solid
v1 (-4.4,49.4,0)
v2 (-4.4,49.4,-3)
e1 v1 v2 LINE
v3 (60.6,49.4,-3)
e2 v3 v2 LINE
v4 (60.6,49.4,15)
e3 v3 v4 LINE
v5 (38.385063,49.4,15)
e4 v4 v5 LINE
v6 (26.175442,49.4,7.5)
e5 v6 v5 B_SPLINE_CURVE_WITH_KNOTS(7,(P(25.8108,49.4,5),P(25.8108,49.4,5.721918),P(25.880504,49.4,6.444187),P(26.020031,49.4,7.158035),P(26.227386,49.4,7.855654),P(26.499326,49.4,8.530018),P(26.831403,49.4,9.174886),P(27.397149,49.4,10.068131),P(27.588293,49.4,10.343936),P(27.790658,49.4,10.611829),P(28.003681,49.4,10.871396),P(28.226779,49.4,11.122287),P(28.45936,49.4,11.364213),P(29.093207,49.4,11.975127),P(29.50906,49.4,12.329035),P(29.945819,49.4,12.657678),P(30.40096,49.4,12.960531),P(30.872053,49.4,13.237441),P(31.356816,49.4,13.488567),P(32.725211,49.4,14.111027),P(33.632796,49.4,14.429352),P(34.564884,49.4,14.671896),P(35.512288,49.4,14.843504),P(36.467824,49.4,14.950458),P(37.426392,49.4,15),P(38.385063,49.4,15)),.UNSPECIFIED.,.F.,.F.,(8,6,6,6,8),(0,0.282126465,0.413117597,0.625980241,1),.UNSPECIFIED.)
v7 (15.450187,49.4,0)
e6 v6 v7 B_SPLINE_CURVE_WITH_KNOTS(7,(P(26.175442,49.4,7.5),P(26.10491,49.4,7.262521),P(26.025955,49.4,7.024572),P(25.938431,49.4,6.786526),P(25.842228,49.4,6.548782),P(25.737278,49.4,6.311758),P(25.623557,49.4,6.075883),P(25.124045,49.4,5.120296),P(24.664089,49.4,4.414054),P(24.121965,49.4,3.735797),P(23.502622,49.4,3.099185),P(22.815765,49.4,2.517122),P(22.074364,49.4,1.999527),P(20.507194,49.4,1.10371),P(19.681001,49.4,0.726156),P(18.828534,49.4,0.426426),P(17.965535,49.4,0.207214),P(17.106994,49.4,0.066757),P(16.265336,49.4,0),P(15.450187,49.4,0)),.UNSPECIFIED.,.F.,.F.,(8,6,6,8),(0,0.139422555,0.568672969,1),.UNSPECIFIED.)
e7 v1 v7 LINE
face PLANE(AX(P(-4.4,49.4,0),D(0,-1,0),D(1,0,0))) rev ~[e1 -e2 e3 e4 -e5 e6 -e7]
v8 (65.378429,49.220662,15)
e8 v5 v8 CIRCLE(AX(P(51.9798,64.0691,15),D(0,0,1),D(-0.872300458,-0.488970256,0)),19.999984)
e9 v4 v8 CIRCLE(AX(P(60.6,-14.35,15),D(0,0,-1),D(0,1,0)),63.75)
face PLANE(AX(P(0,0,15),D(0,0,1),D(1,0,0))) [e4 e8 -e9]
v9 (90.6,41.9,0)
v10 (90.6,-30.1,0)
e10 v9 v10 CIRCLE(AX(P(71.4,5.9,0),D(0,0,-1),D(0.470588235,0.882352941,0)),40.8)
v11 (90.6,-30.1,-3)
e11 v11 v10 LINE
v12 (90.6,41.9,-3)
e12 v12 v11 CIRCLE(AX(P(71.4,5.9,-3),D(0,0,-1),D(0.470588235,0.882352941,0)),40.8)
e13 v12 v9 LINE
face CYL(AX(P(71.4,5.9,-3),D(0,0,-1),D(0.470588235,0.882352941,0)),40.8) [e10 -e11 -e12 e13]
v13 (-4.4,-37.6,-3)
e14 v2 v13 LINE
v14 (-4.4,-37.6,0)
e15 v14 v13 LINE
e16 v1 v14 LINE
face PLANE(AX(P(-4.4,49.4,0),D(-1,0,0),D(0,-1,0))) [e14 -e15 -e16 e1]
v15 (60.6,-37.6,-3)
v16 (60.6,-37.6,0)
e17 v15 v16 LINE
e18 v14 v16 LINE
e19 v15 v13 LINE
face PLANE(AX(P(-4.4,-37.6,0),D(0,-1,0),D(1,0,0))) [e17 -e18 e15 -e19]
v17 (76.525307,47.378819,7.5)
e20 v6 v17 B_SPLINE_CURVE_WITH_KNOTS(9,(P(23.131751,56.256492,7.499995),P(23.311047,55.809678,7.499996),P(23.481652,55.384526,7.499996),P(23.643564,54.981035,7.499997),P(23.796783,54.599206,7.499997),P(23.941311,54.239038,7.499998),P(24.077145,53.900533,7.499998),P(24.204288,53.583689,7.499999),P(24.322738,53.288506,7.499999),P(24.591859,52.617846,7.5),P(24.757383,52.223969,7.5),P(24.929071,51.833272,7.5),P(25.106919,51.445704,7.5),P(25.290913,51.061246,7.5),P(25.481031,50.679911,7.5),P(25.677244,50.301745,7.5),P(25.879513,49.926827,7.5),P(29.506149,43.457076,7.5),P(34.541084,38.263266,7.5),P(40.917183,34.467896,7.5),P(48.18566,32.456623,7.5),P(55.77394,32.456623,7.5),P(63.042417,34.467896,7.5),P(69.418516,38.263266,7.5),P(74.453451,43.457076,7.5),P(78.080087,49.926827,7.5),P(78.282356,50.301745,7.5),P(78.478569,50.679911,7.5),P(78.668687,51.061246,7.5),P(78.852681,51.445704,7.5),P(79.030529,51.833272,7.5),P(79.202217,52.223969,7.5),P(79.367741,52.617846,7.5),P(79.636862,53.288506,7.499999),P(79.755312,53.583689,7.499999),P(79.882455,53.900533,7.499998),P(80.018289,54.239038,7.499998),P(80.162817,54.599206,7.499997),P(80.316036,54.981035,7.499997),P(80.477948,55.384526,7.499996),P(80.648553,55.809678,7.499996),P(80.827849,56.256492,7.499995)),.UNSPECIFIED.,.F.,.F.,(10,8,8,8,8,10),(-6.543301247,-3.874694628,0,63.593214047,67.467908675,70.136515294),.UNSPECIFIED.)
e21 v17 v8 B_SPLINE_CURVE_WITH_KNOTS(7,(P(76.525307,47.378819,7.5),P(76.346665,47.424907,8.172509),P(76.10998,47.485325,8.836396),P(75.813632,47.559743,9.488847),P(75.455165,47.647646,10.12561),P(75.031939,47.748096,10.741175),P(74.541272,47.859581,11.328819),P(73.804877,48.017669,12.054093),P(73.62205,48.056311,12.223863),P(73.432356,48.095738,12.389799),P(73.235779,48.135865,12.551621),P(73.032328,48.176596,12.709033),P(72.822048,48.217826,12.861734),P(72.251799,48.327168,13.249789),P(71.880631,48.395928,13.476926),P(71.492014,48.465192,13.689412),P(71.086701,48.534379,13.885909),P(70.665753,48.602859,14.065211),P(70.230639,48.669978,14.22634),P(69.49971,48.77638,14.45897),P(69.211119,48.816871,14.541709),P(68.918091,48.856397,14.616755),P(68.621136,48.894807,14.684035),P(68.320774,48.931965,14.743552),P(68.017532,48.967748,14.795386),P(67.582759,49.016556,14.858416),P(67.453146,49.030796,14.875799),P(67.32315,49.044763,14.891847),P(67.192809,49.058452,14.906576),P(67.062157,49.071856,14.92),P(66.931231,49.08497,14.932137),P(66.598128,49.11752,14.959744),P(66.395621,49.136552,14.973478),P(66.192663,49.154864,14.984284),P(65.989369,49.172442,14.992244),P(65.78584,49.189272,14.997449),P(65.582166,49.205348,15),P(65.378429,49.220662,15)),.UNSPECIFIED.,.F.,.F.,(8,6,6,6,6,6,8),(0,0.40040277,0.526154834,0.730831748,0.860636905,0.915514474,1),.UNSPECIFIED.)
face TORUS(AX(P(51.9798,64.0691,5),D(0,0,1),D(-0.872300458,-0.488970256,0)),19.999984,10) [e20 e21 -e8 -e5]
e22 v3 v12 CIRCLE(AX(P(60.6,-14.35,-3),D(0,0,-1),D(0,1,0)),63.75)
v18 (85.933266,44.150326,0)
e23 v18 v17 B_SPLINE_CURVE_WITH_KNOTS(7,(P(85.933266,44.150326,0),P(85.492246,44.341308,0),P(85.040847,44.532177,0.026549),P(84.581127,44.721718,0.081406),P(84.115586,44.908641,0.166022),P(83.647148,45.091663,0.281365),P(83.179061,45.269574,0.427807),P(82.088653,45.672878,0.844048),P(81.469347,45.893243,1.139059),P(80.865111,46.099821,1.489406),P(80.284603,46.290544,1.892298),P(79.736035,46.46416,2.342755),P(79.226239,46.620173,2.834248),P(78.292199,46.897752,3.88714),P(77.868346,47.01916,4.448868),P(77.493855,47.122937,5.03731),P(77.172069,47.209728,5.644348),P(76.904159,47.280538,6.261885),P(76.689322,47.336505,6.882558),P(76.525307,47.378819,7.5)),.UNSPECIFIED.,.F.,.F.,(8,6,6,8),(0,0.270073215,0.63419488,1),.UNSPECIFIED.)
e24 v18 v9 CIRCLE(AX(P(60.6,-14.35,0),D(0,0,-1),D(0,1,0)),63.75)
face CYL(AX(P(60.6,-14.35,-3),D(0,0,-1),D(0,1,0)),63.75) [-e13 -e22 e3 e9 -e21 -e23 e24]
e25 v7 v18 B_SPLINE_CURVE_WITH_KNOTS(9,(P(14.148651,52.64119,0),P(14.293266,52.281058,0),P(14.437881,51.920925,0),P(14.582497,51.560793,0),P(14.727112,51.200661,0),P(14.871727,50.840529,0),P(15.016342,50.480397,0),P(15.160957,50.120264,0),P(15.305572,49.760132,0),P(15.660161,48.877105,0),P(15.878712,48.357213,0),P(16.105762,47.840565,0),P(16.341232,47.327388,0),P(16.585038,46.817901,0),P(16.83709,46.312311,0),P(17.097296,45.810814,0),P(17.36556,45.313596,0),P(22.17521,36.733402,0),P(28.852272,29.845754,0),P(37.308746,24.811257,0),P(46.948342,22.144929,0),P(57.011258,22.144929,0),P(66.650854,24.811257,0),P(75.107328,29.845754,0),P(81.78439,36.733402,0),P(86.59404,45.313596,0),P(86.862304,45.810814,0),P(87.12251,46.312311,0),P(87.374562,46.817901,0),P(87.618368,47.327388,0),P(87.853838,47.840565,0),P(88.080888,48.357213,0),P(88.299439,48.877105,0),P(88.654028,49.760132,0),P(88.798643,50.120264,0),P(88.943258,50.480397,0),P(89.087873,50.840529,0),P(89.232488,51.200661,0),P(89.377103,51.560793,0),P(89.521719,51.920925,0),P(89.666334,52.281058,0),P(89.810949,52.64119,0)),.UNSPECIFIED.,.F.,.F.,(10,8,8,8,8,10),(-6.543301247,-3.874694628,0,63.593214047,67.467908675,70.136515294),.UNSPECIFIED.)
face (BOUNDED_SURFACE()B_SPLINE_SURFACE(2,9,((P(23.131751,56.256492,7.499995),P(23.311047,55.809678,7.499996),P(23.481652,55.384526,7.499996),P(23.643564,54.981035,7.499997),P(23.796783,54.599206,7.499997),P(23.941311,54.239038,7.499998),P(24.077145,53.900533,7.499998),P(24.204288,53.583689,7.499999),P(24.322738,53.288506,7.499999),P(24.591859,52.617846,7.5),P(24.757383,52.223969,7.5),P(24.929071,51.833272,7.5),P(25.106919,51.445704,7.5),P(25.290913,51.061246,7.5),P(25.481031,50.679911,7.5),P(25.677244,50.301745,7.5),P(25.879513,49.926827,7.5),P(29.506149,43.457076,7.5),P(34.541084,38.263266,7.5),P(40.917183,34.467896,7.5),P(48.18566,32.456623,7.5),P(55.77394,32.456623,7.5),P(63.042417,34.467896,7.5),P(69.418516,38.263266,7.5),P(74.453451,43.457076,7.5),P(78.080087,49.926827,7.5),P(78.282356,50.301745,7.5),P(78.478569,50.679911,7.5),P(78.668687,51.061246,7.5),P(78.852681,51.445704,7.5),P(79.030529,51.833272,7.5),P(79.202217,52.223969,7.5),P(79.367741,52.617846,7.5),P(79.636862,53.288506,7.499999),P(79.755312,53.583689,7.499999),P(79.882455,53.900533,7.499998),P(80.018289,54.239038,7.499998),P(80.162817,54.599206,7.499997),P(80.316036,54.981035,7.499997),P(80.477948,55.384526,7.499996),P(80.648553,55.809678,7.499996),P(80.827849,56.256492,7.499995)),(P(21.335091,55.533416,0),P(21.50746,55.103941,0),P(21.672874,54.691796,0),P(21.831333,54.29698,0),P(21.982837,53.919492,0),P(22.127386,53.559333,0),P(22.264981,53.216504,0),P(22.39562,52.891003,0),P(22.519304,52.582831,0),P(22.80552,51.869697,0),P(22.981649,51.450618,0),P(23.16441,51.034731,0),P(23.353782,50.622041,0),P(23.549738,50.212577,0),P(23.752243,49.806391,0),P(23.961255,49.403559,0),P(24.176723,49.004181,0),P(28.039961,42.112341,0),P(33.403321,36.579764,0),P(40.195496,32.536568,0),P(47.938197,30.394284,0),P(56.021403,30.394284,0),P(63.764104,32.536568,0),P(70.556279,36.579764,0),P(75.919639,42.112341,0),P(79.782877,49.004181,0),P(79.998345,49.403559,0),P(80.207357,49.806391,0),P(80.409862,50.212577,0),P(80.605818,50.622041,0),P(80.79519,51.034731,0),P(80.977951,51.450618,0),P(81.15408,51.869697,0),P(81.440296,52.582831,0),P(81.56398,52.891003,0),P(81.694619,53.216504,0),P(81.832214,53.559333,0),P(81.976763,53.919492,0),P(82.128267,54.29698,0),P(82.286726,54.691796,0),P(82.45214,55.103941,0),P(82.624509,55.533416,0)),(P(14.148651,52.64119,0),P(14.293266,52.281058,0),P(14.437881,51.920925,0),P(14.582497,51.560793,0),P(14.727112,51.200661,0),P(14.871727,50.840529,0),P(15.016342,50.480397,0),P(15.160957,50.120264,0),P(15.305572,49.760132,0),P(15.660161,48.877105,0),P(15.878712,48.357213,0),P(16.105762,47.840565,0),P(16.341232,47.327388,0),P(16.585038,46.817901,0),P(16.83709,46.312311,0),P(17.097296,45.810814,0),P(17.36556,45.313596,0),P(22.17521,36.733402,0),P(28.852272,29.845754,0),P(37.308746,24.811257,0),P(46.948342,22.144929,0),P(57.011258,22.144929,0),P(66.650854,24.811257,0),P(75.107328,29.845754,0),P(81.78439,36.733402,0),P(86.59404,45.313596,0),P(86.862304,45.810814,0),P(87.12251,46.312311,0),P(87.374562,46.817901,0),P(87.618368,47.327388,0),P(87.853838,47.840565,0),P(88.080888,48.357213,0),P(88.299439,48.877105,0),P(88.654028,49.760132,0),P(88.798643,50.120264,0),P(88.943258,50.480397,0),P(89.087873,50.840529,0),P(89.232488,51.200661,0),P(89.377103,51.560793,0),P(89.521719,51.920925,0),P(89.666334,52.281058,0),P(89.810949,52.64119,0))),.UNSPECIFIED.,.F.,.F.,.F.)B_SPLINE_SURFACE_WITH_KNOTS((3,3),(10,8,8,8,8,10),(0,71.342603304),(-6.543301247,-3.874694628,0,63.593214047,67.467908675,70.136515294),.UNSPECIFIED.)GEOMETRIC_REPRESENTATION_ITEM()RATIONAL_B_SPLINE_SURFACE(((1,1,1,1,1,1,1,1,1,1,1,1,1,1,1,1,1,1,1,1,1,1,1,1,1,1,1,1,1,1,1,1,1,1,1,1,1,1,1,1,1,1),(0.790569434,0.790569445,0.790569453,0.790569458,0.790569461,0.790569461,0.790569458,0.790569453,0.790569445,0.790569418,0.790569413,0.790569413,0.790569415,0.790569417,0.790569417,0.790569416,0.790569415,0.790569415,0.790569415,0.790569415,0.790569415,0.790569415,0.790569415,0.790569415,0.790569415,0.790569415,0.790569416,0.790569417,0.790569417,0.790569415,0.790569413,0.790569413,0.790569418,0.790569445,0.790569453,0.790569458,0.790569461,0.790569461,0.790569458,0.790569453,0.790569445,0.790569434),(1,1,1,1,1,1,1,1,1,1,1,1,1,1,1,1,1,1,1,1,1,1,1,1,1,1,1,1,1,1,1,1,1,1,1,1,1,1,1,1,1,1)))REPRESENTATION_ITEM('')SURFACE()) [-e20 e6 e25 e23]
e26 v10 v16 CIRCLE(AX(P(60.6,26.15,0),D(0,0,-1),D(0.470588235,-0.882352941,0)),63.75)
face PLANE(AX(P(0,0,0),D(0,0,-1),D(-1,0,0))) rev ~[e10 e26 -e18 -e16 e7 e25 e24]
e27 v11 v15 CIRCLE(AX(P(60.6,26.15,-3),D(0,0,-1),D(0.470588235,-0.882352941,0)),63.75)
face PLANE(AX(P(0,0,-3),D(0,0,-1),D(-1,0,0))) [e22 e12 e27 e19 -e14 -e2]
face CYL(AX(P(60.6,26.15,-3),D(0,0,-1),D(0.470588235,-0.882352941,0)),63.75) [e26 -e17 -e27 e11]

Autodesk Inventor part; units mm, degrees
ref_plane "YZ Plane" through (0, 0, 0) normal (1, 0, 0) x (0, 1, 0)
ref_plane "XZ Plane" through (0, 0, 0) normal (0, 1, 0) x (-1, 0, 0)
ref_plane "XY Plane" through (0, 0, 0) normal (0, 0, 1) x (1, 0, 0)
sketch "Sketch1" plane through (0, 0, 0) normal (0, 0, 1) x (1, 0, 0)
  line L0 (-4.4, 49.4) -> (30, 49.4) projected
  line L1 (-4.4, -37.6) -> (30, -37.6) projected
  line L2 (-4.4, -37.6) -> (90.6, -37.6)
  line L3 (90.6, -37.6) -> (90.6, 49.4)
  line L4 (90.6, 49.4) -> (-4.4, 49.4)
  line L5 (-4.4, 49.4) -> (-4.4, -37.6)
  point P0 (0, 0)
  dimension "d0" = 95
extrude "Extrusion1" add sketch "Sketch1" against normal blind 3
sketch "Sketch2" plane through (90.6, -37.6, 0) normal (1, 0, 0) x (0, 0, -1)
  circle A0 centre (17.5922, 43.5) radius 28.5 construction
  point P0 (0, 37.6)
  dimension "d5" = 57
sketch "Sketch3" plane through (0, 0, 0) normal (0, 0, 1) x (1, 0, 0)
  line L0 (90.6, 49.4) -> (-4.4, 49.4) projected
  line L1 (-4.4, 49.4) -> (-4.4, -37.6) projected
  line L2 (-4.4, -37.6) -> (90.6, -37.6) projected
  line L3 (90.6, -37.6) -> (90.6, 49.4) projected
  line L4 (90.6, 49.4) -> (-4.4, 49.4) projected
  line L5 (-4.4, 49.4) -> (90.6, 49.4) projected
  arc A0 (25.8108, 49.4) -> (78.1488, 49.4) centre (51.9798, 64.0691) ccw
  point P0 (0, 0)
  point P1 (25.8108, 49.4)
  point P2 (78.1488, 49.4)
  dimension "d9" = 30
extrude "Extrusion2" add sketch "Sketch3" along normal blind 15 contours A0 L0
sketch "Sketch4" plane through (-4.4, 49.4, -3) normal (0, 1, 0) x (1, 0, 0)
  point P0 (4.4, -3)
fillet "Fillet2" radius 10 2 edges at (51.9798, 34.0691, 15) (51.9798, 34.0691, 0)
sketch "Sketch7" plane through (0, 0, -3) normal (0, 0, -1) x (-1, 0, 0)
  line L0 (4.4, 49.4) -> (-90.6, 49.4) projected
  line L1 (-90.6, 49.4) -> (-90.6, -37.6) projected
  line L2 (-90.6, -37.6) -> (4.4, -37.6) projected
  line L3 (4.4, -37.6) -> (4.4, 49.4) projected
  line L4 (-90.6, -37.6) -> (4.4, -37.6) projected
  arc A0 (-90.6, -30.1) -> (-60.6, -37.6) centre (-60.6, 26.15) ccw
  line L5 (-90.6, 49.4) -> (-90.6, -37.6) projected
  line L6 (-90.6, 5.9) -> (-40.6, 5.9) construction
  arc A1 (-60.6, 49.4) -> (-90.6, 41.9) centre (-60.6, -14.35) ccw
  point P0 (0, 0)
  point P1 (-60.6, -37.6)
  dimension "d11" = 30
  dimension "d12" = 7.5
  dimension "d13" = 50
extrude "Extrusion3" cut sketch "Sketch7" against normal through all contours A1 L1 L0 | L2 L1 A0
sketch "Sketch8" plane through (0, 0, -3) normal (0, 0, -1) x (-1, 0, 0)
  arc A0 (-60.6, 49.4) -> (-90.6, 41.9) centre (-60.6, -14.35) ccw projected
  line L0 (-90.6, 41.9) -> (-90.6, -30.1) projected
  arc A1 (-90.6, -30.1) -> (-60.6, -37.6) centre (-60.6, 26.15) ccw projected
  line L1 (-60.6, -37.6) -> (4.4, -37.6) projected
  line L2 (4.4, -37.6) -> (4.4, 49.4) projected
  line L3 (4.4, 49.4) -> (-60.6, 49.4) projected
  arc A2 (-90.6, -30.1) -> (-60.6, -37.6) centre (-60.6, 26.15) ccw projected
  arc A3 (-90.6, 41.9) -> (-90.6, -30.1) centre (-71.4, 5.9) ccw
  point P0 (0, 0)
extrude "Extrusion4" add sketch "Sketch8" against normal blind 3 contours L0 A3
sketch "Sketch9" plane through (0, 0, -3) normal (0, 0, -1) x (-1, 0, 0)
  line L0 (-52.7475, -27.5099) -> (-72.7475, -27.5099)
  line L1 (-72.7475, -27.5099) -> (-72.7475, -34.5099)
  line L2 (-72.7475, -34.5099) -> (-52.7475, -34.5099)
  line L3 (-52.7475, -34.5099) -> (-52.7475, -27.5099)
  line L4 (4.4, -37.6) -> (4.4, 49.4) projected
  line L5 (4.4, 5.9) -> (-145.6, 5.9) construction
  line L6 (-52.7475, 39.3099) -> (-72.7475, 39.3099)
  line L7 (-72.7475, 39.3099) -> (-72.7475, 46.3099)
  line L8 (-72.7475, 46.3099) -> (-52.7475, 46.3099)
  line L9 (-52.7475, 46.3099) -> (-52.7475, 39.3099)
  point P0 (0, 0)
  dimension "d19" = 20
  dimension "d20" = 7
  dimension "d21" = 150
extrude "Extrusion5" [suppressed]
sketch "Sketch10" plane through (0, 0, 0) normal (0, 0, 1) x (1, 0, 0)
  line L0 (0.15, 35.15) -> (22.95, 35.15) projected
  line L1 (6.4671, 26.3395) -> (10.4671, 29.307) projected
  line L2 (-4.4, 32.9) -> (30, 32.9) projected
  arc A0 (90.6, 41.9) -> (85.9332, 44.1503) centre (60.6, -14.35) ccw projected
  line L3 (15.4501, 49.4) -> (-4.4, 49.4) projected
  line L4 (-4.4, 49.4) -> (-4.4, -37.6) projected
  line L5 (-4.4, -37.6) -> (60.6, -37.6) projected
  arc A1 (60.6, -37.6) -> (90.6, -30.1) centre (60.6, 26.15) ccw projected
  arc A2 (90.6, -30.1) -> (90.6, 41.9) centre (71.4, 5.9) ccw projected
  line L6 (-4.4, 49.4) -> (60.6, 49.4) projected
  arc A3 (3.8712, 49.4) -> (-4.4, 18.2775) centre (37.3788, 23.8346) ccw
  line L7 (60.6, -37.6) -> (-4.4, -37.6) projected
  arc A4 (-4.4, 18.2775) -> (19.2096, -37.6) centre (64.8355, 14.6046) ccw
  point P0 (0, 0)
sketch "Sketch12" plane through (-4.4, 49.4, 0) normal (0, 1, 0) x (1, 0, 0)
  line L0 (36.1854, -19.7901) -> (34.9706, -16.4151) projected
  line L1 (34.9706, -16.4151) -> (30.2063, -18.8238) projected
  line L2 (29.3711, -16.5035) -> (30.2063, -18.8238) projected
  line L3 (34.1354, -14.0948) -> (29.3711, -16.5035) projected
  line L4 (34.1354, -14.0948) -> (33.0724, -11.1417) projected
  line L5 (33.0724, -11.1417) -> (62.871, 3.9237) projected
  line L6 (67.8822, -9.9981) -> (62.871, 3.9237) projected
  line L7 (38.0836, -25.0635) -> (67.8822, -9.9981) projected
  line L8 (38.0836, -25.0635) -> (37.0206, -22.1104) projected
  line L9 (37.0206, -22.1104) -> (32.2563, -24.5191) projected
  line L10 (31.4211, -22.1988) -> (32.2563, -24.5191) projected
  line L11 (36.1854, -19.7901) -> (31.4211, -22.1988) projected
  line L12 (65, -15) -> (65, 3) projected
  line L13 (0, 3) -> (65, 3) projected
  line L14 (0, 0) -> (0, 3) projected
  line L15 (19.8501, 0) -> (0, 0) projected
  line L16 (65, -15) -> (42.785, -15) projected
  point P0 (4.4, 0)
properties part number "Palma"
